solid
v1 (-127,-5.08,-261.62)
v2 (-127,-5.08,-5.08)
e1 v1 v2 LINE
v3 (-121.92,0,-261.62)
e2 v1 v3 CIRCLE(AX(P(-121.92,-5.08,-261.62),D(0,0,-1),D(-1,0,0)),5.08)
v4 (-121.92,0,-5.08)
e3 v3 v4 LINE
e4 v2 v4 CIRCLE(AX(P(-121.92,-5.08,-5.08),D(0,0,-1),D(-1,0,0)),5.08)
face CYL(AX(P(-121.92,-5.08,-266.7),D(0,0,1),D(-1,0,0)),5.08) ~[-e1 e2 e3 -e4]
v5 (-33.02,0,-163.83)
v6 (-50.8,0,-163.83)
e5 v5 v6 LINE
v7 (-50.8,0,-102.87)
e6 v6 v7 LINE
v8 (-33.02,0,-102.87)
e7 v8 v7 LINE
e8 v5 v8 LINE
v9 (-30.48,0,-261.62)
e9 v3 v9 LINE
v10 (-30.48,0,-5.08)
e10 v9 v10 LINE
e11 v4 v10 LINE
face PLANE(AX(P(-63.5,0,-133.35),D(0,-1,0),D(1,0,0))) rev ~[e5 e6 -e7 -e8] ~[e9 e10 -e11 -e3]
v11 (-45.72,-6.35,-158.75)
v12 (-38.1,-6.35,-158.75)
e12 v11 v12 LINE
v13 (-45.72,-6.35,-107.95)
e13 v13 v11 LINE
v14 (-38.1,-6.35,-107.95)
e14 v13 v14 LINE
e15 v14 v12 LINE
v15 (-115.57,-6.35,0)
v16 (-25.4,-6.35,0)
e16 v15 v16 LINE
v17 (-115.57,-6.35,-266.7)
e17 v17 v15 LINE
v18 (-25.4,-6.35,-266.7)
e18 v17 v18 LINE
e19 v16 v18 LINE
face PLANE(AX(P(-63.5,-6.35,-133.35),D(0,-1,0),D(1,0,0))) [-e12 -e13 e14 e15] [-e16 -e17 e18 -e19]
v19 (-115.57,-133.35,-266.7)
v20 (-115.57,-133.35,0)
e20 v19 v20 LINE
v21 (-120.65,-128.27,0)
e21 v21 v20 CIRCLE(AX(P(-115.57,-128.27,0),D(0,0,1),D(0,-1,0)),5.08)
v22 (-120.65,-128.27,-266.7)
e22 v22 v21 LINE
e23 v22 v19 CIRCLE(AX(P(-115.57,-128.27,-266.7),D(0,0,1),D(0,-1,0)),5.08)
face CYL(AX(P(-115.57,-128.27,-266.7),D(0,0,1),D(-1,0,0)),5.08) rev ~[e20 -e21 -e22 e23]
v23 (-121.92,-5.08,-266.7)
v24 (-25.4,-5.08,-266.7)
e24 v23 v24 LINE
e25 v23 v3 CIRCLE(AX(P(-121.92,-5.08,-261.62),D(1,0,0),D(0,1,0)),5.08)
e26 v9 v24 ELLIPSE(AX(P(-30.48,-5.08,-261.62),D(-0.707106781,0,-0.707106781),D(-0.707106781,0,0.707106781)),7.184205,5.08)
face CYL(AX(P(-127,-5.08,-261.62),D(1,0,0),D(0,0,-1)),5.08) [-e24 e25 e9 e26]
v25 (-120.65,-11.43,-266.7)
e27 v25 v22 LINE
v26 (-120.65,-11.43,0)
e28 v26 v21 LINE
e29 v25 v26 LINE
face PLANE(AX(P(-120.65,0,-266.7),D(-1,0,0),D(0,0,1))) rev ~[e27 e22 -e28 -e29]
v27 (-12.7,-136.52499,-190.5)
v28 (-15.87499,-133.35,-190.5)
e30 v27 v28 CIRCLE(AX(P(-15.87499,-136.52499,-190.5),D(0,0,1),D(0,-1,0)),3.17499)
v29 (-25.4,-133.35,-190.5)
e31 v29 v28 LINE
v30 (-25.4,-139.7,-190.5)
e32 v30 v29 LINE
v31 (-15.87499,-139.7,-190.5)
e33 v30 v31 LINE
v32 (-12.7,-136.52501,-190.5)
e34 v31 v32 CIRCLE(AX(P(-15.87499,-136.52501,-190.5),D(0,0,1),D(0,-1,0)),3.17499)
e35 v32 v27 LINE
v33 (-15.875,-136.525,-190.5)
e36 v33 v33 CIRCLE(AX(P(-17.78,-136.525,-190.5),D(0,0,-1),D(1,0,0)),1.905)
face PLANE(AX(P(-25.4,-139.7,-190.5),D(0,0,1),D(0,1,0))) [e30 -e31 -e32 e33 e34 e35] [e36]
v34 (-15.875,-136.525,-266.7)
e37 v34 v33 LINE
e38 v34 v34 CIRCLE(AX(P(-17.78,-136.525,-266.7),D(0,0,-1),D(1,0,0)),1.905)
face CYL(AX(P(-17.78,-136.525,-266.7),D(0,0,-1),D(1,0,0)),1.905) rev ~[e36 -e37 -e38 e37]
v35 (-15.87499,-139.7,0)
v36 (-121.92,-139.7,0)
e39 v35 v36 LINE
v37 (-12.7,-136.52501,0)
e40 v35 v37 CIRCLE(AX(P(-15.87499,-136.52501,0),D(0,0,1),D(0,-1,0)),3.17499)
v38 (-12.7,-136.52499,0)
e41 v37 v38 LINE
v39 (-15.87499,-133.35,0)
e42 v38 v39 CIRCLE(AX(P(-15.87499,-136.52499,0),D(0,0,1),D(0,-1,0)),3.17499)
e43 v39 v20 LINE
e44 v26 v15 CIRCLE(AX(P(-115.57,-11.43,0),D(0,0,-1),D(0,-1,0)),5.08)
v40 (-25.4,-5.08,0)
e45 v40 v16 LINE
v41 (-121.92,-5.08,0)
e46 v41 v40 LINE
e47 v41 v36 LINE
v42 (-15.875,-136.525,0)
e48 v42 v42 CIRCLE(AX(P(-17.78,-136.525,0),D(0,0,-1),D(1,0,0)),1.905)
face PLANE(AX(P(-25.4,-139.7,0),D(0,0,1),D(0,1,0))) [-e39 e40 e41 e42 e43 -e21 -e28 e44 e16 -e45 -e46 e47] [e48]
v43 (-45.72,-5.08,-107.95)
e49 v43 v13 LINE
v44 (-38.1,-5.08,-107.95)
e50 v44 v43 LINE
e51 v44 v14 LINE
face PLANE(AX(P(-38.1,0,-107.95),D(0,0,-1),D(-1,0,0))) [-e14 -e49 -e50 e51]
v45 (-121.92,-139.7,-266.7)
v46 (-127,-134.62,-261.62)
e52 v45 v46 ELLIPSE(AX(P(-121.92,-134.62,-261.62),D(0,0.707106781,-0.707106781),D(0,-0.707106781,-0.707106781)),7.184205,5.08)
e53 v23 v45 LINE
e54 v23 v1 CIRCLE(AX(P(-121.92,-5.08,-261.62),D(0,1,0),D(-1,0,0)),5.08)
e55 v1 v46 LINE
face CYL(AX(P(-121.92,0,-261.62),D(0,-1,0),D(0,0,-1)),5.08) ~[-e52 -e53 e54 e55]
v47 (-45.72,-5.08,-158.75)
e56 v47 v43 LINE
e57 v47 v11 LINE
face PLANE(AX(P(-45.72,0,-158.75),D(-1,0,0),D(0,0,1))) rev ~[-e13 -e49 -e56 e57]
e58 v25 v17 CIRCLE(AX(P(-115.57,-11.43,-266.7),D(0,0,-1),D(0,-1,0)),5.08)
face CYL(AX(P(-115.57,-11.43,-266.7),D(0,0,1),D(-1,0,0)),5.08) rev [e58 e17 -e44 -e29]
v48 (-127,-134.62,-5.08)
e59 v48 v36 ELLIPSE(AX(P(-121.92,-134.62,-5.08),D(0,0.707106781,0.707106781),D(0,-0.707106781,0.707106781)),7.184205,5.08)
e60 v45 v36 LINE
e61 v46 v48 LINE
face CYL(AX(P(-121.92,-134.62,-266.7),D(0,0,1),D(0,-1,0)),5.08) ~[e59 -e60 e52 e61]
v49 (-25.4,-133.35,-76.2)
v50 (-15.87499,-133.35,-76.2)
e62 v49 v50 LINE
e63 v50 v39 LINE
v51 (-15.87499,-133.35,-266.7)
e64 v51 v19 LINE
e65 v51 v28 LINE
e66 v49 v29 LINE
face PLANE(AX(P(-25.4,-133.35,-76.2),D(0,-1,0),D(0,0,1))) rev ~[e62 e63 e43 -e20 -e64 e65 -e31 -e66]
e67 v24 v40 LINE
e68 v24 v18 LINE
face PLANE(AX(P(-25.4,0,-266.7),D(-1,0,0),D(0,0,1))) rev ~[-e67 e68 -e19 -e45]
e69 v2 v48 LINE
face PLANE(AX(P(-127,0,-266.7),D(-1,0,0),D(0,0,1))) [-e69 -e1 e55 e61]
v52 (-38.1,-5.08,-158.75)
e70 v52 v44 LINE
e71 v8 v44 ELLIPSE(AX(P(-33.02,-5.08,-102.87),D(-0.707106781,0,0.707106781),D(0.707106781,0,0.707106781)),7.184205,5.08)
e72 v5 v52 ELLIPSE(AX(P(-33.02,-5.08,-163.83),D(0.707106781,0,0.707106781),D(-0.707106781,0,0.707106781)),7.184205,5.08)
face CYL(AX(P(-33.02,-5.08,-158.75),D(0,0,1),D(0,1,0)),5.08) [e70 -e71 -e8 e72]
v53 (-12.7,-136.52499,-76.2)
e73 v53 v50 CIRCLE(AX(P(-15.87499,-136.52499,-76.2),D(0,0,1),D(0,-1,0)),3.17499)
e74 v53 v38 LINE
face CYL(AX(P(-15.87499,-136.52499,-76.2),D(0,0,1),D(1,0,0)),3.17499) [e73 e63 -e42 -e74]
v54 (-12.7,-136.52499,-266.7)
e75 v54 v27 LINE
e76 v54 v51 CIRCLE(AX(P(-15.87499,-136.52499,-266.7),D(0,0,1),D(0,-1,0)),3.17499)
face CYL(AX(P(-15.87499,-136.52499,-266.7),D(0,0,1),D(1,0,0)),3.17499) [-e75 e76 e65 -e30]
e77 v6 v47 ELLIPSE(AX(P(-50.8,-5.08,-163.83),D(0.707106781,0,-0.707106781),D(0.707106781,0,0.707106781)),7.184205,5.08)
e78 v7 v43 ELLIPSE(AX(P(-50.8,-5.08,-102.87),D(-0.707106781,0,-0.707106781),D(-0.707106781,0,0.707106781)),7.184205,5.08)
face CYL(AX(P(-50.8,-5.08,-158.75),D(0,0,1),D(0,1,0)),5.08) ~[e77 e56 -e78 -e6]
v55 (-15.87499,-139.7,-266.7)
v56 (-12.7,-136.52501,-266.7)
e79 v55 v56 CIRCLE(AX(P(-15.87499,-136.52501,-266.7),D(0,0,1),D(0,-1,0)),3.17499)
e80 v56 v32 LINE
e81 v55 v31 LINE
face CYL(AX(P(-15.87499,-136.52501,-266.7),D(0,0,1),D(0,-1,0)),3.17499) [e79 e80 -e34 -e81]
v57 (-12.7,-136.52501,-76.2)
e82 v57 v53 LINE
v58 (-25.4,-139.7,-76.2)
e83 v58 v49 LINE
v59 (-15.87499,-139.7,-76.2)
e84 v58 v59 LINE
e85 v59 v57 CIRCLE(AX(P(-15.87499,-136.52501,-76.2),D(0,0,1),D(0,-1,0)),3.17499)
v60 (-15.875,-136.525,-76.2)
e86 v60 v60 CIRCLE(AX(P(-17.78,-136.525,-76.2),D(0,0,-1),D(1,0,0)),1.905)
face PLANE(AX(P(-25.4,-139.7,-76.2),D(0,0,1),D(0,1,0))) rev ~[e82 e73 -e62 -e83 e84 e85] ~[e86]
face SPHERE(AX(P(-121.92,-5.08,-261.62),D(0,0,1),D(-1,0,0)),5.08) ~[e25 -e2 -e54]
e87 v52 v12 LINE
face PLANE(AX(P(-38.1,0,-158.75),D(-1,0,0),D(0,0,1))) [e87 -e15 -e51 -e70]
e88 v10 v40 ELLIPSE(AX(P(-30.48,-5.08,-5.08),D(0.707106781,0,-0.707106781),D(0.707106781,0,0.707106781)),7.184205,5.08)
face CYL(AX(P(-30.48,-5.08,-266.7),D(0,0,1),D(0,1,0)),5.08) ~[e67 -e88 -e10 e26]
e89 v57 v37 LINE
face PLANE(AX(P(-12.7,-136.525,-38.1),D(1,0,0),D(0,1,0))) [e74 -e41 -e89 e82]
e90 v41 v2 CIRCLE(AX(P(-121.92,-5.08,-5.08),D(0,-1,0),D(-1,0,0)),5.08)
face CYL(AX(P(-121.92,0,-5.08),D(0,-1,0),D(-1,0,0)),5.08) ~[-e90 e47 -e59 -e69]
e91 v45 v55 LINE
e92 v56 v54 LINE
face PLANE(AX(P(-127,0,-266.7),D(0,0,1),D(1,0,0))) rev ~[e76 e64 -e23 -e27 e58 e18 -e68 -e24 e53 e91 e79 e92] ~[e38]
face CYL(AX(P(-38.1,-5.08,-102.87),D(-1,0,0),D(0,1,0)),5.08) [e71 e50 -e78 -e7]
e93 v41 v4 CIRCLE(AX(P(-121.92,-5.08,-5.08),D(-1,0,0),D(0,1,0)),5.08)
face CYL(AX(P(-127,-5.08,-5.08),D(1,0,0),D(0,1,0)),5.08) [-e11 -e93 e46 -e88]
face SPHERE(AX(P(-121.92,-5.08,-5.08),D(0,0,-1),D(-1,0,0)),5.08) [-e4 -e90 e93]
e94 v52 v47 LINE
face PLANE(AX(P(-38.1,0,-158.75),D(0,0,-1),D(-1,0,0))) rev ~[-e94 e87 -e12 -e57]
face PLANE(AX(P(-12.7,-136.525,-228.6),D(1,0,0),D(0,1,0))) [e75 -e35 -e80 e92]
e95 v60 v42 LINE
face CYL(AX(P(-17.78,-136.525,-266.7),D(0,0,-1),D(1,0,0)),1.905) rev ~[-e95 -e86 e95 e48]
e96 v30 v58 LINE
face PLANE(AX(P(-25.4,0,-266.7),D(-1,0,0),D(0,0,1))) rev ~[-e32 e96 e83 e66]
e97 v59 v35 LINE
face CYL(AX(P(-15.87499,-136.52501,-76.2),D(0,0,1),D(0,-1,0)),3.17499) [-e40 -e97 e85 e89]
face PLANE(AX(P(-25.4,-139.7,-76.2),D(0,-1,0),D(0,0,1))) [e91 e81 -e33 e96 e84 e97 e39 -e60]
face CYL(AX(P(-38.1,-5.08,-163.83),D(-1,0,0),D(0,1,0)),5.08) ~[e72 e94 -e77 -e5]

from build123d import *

# Parameters (mm, degrees)
F0_W      = 127
F0_H      = 266.7
F1_DEPTH  = 139.7
F2_T      = -6.35
F3_R      = 5.08
F4_DEPTH  = 25.4
F5_W      = 7.62
F5_H      = 50.8
F6_DEPTH  = 25.4
F7_R      = 1.905
F8_DEPTH  = 266.701
F9_R      = 5.08
F11_W     = 6.35
F11_H     = 76.2
F12_DEPTH = 12.7
F13_DEPTH = 266.701
F14_R     = 3.17499


# Not quite as in the source:
# - a fillet or chamfer is up to 0.001 mm smaller than in the source, because OpenCascade refuses the exact size


with BuildPart() as f1:
    # F0 (on Front) → F1 (new body)
    with BuildSketch(Plane.XZ):
        with Locations((-63.5, -133.35)):
            Rectangle(F0_W, F0_H)
    extrude(amount=F1_DEPTH)

    # F2
    f2_openings = [f1.faces().sort_by_distance(p)[0] for p in [
        (-63.5, -69.85, -266.7),
        (-63.5, -69.85, 0),
    ]]
    offset(amount=F2_T, openings=f2_openings)

    # F3
    f3_edges = [f1.edges().sort_by_distance(p)[0] for p in [
        (-6.35, -133.35, -133.35),
        (-120.65, -133.35, -133.35),
        (-6.35, -6.35, -133.35),
        (-120.65, -6.35, -133.35),
    ]]
    fillet(f3_edges, radius=F3_R)

    # F4 (cut): a face of the model
    f4_faces = [f1.faces().sort_by_distance(p)[0] for p in [
        (0, -69.85, -133.35),
    ]]
    extrude(f4_faces, amount=-F4_DEPTH, mode=Mode.SUBTRACT)

    # F5 (on face) → F6 (cut)
    with BuildSketch(Plane(origin=(0, 0, 0), x_dir=(-1, 0, 0), z_dir=(0, 1, 0))):
        with Locations((41.91, -133.35)):
            Rectangle(F5_W, F5_H)
    extrude(amount=-F6_DEPTH, mode=Mode.SUBTRACT)

    # F7 (on face) → F8 (cut, through all)
    with BuildSketch(Plane(origin=(0, 0, -266.7), x_dir=(1, 0, 0), z_dir=(0, 0, -1))):
        with Locations((-17.78, 136.525)):
            Circle(F7_R)
    extrude(amount=-F8_DEPTH, mode=Mode.SUBTRACT)

    # F9
    f9_edges = [f1.edges().sort_by_distance(p)[0] for p in [
        (-127, 0, -133.35),
        (-127, -69.85, -266.7),
        (-127, -69.85, 0),
        (-127, -139.7, -133.35),
        (-25.4, 0, -133.35),
        (-76.2, 0, -266.7),
        (-76.2, 0, 0),
        (-45.72, 0, -133.35),
        (-41.91, 0, -158.75),
        (-38.1, 0, -133.35),
        (-41.91, 0, -107.95),
    ]]
    fillet(f9_edges, radius=F9_R)

    # F11 (on offset) → F12 (join)
    with BuildSketch(Plane.YZ.offset(-25.4)):
        with Locations((-136.525, -38.1)):
            Rectangle(F11_W, F11_H)
        with Locations((-136.525, -228.6)):
            Rectangle(F11_W, F11_H)
    extrude(amount=F12_DEPTH)

    # F7 (on face) → F13 (cut, through all)
    with BuildSketch(Plane(origin=(0, 0, -266.7), x_dir=(1, 0, 0), z_dir=(0, 0, -1))):
        with Locations((-17.78, 136.525)):
            Circle(F7_R)
    extrude(amount=-F13_DEPTH, mode=Mode.SUBTRACT)

    # F14 (radius 3.175 in the source; OpenCascade refuses exactly that, so slightly less here)
    f14_edges = [f1.edges().sort_by_distance(p)[0] for p in [
        (-12.7, -133.35, -228.6),
        (-12.7, -133.35, -38.1),
        (-12.7, -139.7, -38.1),
        (-12.7, -139.7, -228.6),
    ]]
    fillet(f14_edges, radius=F14_R)


solid = f1.part
